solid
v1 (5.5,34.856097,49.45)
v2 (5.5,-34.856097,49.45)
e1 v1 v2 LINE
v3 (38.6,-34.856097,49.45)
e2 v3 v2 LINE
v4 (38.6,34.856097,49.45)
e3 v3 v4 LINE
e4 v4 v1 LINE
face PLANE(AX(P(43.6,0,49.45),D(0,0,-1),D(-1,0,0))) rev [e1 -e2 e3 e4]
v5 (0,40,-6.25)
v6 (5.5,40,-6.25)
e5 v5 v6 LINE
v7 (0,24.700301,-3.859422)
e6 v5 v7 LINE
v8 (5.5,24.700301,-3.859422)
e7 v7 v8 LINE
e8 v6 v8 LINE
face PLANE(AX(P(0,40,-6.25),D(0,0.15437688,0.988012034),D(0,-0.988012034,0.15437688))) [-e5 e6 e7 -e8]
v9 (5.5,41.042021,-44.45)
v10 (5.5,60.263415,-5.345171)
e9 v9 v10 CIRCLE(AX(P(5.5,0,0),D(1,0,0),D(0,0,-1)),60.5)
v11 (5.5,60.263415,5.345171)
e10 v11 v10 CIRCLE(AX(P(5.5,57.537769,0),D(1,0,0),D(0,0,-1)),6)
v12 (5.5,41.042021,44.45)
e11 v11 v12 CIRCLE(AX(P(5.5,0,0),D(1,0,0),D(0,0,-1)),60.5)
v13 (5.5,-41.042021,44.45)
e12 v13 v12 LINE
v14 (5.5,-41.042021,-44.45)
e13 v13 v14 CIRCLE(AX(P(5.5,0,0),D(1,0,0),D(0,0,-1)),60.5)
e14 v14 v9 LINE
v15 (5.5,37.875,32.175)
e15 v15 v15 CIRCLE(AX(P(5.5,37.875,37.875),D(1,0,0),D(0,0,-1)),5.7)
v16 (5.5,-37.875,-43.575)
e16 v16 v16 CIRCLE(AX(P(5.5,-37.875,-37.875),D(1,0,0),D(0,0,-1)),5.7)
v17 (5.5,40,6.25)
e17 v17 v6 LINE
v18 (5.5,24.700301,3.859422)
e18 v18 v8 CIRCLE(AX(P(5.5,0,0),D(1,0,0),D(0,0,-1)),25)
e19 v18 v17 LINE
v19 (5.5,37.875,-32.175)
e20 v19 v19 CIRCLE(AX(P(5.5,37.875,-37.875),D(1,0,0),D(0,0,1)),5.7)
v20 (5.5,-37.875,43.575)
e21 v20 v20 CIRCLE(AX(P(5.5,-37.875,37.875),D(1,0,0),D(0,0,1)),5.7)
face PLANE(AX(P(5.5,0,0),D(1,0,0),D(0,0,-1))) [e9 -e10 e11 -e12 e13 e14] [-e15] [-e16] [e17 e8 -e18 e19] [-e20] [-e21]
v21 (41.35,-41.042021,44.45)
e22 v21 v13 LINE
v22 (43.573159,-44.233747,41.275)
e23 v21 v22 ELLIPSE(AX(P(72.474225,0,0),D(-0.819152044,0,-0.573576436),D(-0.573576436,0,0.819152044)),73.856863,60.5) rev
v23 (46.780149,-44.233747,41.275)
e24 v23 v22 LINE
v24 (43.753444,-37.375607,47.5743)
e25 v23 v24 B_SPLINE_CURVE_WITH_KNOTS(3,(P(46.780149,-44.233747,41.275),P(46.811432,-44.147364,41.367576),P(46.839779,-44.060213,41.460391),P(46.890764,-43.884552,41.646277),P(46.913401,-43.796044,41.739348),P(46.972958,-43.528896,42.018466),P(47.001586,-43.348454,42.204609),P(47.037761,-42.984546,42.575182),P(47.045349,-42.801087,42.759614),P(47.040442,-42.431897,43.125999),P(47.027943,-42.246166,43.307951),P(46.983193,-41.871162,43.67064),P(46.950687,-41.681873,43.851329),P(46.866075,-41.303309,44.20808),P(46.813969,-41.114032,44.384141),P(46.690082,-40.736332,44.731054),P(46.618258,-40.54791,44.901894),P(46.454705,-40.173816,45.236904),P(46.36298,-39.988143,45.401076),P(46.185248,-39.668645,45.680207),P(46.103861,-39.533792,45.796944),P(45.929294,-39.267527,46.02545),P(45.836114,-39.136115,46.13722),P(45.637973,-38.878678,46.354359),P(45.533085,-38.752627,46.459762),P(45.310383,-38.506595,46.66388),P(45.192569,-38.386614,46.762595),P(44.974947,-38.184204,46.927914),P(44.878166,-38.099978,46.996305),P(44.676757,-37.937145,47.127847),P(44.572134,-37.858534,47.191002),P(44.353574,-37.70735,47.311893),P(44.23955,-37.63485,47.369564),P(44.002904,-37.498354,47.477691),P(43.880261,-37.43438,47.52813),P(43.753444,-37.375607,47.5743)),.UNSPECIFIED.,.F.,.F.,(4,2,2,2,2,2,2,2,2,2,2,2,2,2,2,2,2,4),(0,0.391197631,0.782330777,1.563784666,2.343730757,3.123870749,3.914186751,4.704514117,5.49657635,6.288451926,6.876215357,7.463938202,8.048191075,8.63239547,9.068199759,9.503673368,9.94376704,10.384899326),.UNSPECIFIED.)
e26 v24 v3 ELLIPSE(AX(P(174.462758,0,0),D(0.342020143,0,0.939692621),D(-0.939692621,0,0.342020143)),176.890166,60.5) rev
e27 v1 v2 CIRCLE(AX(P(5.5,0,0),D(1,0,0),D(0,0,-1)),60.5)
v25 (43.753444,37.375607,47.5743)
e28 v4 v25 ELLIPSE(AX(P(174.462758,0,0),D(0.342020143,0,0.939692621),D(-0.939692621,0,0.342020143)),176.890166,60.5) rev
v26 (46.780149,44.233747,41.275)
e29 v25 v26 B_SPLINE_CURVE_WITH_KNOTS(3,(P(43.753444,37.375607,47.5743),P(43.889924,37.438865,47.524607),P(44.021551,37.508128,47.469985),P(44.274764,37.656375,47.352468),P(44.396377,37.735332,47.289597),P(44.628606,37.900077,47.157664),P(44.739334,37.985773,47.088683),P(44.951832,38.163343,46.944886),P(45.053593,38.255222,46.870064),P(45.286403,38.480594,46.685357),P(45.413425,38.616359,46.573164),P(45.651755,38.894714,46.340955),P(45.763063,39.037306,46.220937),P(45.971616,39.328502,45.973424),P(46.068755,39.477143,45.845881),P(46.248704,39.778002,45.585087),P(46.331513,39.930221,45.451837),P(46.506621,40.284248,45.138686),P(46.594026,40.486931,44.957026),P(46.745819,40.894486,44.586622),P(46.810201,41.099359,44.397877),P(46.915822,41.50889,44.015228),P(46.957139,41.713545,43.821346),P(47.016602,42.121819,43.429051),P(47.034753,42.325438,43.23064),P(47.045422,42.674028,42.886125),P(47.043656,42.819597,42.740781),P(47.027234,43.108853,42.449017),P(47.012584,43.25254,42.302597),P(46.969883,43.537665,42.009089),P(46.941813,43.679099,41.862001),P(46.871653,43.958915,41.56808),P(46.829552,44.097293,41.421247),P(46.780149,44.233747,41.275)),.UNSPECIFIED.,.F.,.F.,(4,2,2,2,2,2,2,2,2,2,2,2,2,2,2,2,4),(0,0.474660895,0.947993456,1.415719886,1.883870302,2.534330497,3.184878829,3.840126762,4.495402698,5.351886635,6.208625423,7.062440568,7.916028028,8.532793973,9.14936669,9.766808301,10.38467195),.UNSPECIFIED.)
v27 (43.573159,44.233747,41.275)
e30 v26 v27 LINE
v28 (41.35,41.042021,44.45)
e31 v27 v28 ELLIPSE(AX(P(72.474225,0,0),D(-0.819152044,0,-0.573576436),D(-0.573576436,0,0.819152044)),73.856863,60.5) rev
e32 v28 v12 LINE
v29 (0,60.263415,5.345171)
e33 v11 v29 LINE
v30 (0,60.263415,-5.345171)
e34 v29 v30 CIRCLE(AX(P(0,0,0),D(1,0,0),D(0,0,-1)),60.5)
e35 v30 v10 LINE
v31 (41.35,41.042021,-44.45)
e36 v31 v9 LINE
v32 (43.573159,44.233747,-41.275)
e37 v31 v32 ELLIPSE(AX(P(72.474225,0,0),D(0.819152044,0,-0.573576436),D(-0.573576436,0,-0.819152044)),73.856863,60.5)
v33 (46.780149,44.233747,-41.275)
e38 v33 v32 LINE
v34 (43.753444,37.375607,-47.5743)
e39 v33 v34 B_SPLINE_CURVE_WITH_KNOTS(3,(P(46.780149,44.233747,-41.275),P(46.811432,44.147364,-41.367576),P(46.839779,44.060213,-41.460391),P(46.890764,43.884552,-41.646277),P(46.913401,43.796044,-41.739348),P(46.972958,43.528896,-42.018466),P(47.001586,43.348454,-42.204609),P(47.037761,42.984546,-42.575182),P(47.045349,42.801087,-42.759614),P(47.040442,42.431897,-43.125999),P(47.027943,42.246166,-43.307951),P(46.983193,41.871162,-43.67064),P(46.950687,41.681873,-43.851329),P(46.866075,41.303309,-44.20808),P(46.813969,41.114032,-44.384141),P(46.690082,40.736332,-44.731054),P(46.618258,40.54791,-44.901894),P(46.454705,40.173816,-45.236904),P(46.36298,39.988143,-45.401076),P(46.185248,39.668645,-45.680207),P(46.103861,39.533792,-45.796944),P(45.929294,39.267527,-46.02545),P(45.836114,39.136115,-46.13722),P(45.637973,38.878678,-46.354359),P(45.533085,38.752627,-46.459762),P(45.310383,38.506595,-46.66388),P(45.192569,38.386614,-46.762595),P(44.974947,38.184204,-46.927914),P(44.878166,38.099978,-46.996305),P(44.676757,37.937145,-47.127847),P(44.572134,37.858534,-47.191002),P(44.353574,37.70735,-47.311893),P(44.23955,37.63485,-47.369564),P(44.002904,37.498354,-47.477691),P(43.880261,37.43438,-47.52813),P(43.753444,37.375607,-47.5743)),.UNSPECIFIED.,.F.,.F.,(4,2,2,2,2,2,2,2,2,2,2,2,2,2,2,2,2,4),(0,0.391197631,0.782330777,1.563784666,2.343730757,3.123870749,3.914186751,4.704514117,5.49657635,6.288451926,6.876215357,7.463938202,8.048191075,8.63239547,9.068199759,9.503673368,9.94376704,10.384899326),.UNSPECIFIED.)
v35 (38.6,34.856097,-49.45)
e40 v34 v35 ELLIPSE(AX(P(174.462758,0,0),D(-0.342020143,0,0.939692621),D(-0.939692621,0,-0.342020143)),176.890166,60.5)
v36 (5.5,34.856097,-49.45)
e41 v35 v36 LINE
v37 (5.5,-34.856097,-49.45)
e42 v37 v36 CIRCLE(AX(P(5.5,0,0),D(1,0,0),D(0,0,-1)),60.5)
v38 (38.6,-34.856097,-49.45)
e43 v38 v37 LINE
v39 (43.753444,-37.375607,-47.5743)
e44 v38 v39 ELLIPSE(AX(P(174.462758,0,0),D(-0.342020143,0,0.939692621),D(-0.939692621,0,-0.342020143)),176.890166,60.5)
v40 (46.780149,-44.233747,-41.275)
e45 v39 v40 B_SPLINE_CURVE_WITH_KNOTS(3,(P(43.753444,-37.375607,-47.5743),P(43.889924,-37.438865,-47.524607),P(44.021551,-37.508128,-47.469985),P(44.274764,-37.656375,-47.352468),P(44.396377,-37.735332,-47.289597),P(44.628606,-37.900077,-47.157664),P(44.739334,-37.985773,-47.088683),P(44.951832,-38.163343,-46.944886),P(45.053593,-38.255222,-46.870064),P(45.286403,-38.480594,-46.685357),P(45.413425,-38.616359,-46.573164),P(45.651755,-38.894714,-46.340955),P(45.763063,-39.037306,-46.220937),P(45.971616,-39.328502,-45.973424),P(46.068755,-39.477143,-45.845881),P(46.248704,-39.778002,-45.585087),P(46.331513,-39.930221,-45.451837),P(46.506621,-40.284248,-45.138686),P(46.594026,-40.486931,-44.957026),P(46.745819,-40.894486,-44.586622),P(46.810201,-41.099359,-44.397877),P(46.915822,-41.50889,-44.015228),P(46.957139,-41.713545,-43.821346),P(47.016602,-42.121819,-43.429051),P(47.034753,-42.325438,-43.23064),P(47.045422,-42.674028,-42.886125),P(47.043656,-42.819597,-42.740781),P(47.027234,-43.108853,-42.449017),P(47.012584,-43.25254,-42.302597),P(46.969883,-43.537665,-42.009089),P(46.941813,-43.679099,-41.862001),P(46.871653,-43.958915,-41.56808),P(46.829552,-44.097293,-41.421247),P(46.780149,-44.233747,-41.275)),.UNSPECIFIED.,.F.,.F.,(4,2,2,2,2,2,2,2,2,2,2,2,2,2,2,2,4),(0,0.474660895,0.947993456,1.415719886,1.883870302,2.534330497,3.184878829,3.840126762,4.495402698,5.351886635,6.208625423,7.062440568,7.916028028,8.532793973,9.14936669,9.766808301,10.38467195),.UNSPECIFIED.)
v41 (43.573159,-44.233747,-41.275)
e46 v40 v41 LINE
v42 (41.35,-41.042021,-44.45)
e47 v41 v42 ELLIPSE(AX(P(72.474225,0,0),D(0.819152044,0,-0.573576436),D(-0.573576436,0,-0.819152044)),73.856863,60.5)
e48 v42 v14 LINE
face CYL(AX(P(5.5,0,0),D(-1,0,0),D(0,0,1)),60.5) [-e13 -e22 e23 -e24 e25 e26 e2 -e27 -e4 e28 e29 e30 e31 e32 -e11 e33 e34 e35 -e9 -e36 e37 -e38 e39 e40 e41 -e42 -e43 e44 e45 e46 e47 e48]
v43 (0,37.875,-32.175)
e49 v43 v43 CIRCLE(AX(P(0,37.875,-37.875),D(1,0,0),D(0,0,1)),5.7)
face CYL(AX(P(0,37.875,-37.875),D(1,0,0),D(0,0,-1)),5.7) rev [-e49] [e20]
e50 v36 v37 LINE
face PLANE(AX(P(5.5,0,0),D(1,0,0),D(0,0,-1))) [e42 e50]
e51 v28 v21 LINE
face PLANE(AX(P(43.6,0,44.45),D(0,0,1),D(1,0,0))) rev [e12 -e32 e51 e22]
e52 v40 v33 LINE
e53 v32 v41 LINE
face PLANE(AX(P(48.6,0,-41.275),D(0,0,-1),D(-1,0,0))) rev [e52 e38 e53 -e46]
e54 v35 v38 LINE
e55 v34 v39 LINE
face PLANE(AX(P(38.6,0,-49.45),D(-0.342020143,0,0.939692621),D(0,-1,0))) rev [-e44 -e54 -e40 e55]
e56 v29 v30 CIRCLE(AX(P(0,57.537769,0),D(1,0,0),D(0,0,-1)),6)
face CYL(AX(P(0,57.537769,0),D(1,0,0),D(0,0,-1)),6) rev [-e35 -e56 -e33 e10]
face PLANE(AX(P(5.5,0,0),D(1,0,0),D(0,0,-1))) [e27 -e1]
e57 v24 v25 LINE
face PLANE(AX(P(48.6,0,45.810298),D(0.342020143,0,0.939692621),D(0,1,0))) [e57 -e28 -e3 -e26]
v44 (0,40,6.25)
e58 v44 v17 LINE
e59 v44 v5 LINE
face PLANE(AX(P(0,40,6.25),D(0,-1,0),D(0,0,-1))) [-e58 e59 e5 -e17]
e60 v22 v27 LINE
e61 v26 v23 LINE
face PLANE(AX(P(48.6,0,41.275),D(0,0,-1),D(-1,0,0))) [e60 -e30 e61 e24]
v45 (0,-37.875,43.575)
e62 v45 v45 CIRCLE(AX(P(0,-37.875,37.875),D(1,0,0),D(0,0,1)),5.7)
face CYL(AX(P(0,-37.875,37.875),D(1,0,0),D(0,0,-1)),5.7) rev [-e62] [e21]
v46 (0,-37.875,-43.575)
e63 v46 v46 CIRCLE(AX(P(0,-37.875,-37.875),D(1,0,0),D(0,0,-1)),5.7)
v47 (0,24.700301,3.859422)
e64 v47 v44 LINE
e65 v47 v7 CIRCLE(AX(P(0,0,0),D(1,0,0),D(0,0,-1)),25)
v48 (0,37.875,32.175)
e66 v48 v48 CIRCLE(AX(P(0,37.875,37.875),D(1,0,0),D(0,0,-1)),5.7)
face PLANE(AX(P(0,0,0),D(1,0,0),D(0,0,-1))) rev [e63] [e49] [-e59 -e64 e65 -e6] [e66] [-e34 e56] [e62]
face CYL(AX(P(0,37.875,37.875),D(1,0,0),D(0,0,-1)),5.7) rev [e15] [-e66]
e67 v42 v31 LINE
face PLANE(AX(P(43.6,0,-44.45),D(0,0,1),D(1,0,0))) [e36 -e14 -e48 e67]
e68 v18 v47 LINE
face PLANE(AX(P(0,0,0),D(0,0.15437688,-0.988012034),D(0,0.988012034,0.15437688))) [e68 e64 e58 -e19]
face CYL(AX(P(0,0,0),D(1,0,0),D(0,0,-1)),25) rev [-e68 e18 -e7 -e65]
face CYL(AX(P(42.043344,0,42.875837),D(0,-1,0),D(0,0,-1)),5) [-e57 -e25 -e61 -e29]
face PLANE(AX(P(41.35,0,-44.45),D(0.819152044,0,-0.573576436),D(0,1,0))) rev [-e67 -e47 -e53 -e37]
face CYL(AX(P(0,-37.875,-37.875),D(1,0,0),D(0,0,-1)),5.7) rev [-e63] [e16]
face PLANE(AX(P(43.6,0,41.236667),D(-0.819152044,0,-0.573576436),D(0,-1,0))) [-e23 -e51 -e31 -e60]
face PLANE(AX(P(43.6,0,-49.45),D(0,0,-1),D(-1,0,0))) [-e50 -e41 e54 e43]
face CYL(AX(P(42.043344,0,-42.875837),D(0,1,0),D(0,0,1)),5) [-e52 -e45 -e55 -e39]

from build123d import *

# Parameters (mm, degrees)
SKETCH1_R           = 60.5
BOSS_EXTRUDE1_DEPTH = 5.5
SKETCH2_R           = 5.7
SKETCH2_R_2         = 25
CUT_EXTRUDE1_DEPTH  = 86.736514975
BOSS_EXTRUDE2_DEPTH = 38.1
BOSS_EXTRUDE3_DEPTH = 5
CHAMFER1_SIZE       = 10
CHAMFER1_SIZE_2     = 3.639702343
CHAMFER2_SIZE       = 10
CHAMFER2_SIZE2      = 3.639702343
CHAMFER3_SIZE       = 1.819851171
CHAMFER3_SIZE_2     = 5
CHAMFER4_SIZE       = 5
CHAMFER4_SIZE_2     = 1.819851171
FILLET1_R           = 5
CHAMFER5_SIZE       = 3.213333015
CHAMFER5_SIZE_2     = 2.25
CHAMFER6_SIZE       = 2.25
CHAMFER6_SIZE_2     = 3.213333015
SKETCH5_R           = 6
CUT_EXTRUDE2_DEPTH  = 96.112299108


with BuildPart() as part:
    # Sketch1 → Boss-Extrude1 (new body)
    with BuildSketch(Plane(origin=(0, 0, 0), x_dir=(0, 0, -1), z_dir=(1, 0, 0))):
        Circle(SKETCH1_R)
    extrude(amount=BOSS_EXTRUDE1_DEPTH)

    # Sketch2 → Cut-Extrude1 (cut, through all)
    with BuildSketch(Plane(origin=(5.5, 0, 0), x_dir=(0, 0, -1), z_dir=(1, 0, 0))):
        with Locations((-37.875, 37.875)):
            Circle(SKETCH2_R)
        with Locations(Location((37.875, 37.875, 0), (0, 0, 180))):
            Circle(SKETCH2_R)
        with Locations((37.875, -37.875)):
            Circle(SKETCH2_R)
        with Locations(Location((-37.875, -37.875, 0), (0, 0, 180))):
            Circle(SKETCH2_R)
        Circle(SKETCH2_R_2)
    extrude(amount=-CUT_EXTRUDE1_DEPTH, mode=Mode.SUBTRACT)

    # Sketch3 → Boss-Extrude2 (add)
    with BuildSketch(Plane(origin=(5.5, 0, 0), x_dir=(0, 0, -1), z_dir=(1, 0, 0))):
        with BuildLine():
            ThreePointArc((-44.45, 41.042021149), (-47.05176845, 38.03131717), (-49.45, 34.856097028))
            Line((-49.45, 34.856097028), (-49.45, -34.856097028))
            ThreePointArc((-49.45, -34.856097028), (-47.05176845, -38.03131717), (-44.45, -41.042021149))
            Line((-44.45, -41.042021149), (-44.45, 41.042021149))
        make_face()
        with BuildLine():
            ThreePointArc((49.45, 34.856097028), (47.05176845, 38.03131717), (44.45, 41.042021149))
            Line((44.45, 41.042021149), (44.45, -41.042021149))
            ThreePointArc((44.45, -41.042021149), (47.05176845, -38.03131717), (49.45, -34.856097028))
            Line((49.45, -34.856097028), (49.45, 34.856097028))
        make_face()
    extrude(amount=BOSS_EXTRUDE2_DEPTH)

    # Sketch4 → Boss-Extrude3 (add)
    with BuildSketch(Plane(origin=(43.6, 0, 0), x_dir=(0, 0, -1), z_dir=(1, 0, 0))):
        with BuildLine():
            Line((-41.275, -44.233747015), (-41.275, 44.233747015))
            ThreePointArc((-41.275, 44.233747015), (-42.892198414, 42.667426865), (-44.45, 41.042021149))
            Line((-44.45, 41.042021149), (-44.45, -41.042021149))
            ThreePointArc((-44.45, -41.042021149), (-42.892198414, -42.667426865), (-41.275, -44.233747015))
        make_face()
        with BuildLine():
            Line((-49.45, 34.856097028), (-49.45, -34.856097028))
            ThreePointArc((-49.45, -34.856097028), (-47.05176845, -38.03131717), (-44.45, -41.042021149))
            Line((-44.45, -41.042021149), (-44.45, 41.042021149))
            ThreePointArc((-44.45, 41.042021149), (-47.05176845, 38.03131717), (-49.45, 34.856097028))
        make_face()
        with BuildLine():
            Line((49.45, -34.856097028), (49.45, 34.856097028))
            ThreePointArc((49.45, 34.856097028), (45.604182769, 39.755609842), (41.275, 44.233747015))
            Line((41.275, 44.233747015), (41.275, -44.233747015))
            ThreePointArc((41.275, -44.233747015), (45.604182769, -39.755609842), (49.45, -34.856097028))
        make_face()
    extrude(amount=BOSS_EXTRUDE3_DEPTH)

    # Chamfer1
    # the kernel refuses this chamfer: 10, 3.639702343 mm, written as the material it takes off along each edge
    with BuildSketch(Plane(origin=(48.6, 60.798044353, 49.45), x_dir=(-0.9999130865277315, 0, 0.013184058198646176), z_dir=(0, -1, 0))) as chamfer1_piece_1:
        Polygon((CHAMFER1_SIZE * 0.999913086528, CHAMFER1_SIZE * 0.0131840581986), (-CHAMFER1_SIZE_2 * 0.0131840581974, CHAMFER1_SIZE_2 * 0.999913086435), (0, 0), align=None)
    extrude(amount=121.596088706, mode=Mode.SUBTRACT)

    # Chamfer2
    chamfer2_edges = [part.edges().sort_by_distance(p)[0] for p in [
        (48.6, 0, -49.45),
    ]]
    chamfer2_side = [part.faces().sort_by_distance(p)[0] for p in [
        (27.05, 0, -49.45),
    ]]
    chamfer(chamfer2_edges, length=CHAMFER2_SIZE, length2=CHAMFER2_SIZE2, reference=chamfer2_side[0])

    # Chamfer3
    # the kernel refuses this chamfer: 5, 1.819851171 mm, written as the material it takes off along each edge
    with BuildSketch(Plane(origin=(48.6, -57.204720678, 41.275), x_dir=(-0.9950833631817487, 0, -0.09904090225204971), z_dir=(0, 1, 0))) as chamfer3_piece_1:
        Polygon((CHAMFER3_SIZE * 0.995083363363, CHAMFER3_SIZE * 0.0990409022701), (-CHAMFER3_SIZE_2 * 0.099040902252, CHAMFER3_SIZE_2 * 0.995083363182), (0, 0), align=None)
    extrude(amount=114.409441356, mode=Mode.SUBTRACT)

    # Chamfer4
    # the kernel refuses this chamfer: 5, 1.819851171 mm, written as the material it takes off along each edge
    with BuildSketch(Plane(origin=(48.6, 57.204720678, -41.275), x_dir=(0.013184058198646176, 0, -0.9999130865277315), z_dir=(0, -1, 0))) as chamfer4_piece_1:
        Polygon((CHAMFER4_SIZE * 0.999913086528, -CHAMFER4_SIZE * 0.0131840581986), (-CHAMFER4_SIZE_2 * 0.013184058201, -CHAMFER4_SIZE_2 * 0.99991308671), (0, 0), align=None)
    extrude(amount=114.409441356, mode=Mode.SUBTRACT)

    # Fillet1
    # the kernel refuses this fillet: 5 mm, written as the material it takes off along each edge
    with BuildSketch(Plane(origin=(48.450647546, -51.951472504, -45.864657505), x_dir=(-0.9396926207859081, 0, -0.34202014332566955), z_dir=(0, 1, 0))) as fillet1_piece_1:
        with BuildLine():
            CenterArc((4.998659123, 5), FILLET1_R, 181.326957093, 88.673042907)
            Line((0, 4.8842115), (-0.099973182, 4.88189573))
            ThreePointArc((-0.099973182, 4.88189573), (-0.1, 2.44210575), (-0.1, 0))
            Line((-0.1, 0), (0, -0.1))
            Line((0, -0.1), (4.998659123, -0.1))
            Line((4.998659123, -0.1), (4.998659123, 0))
        make_face()
    extrude(amount=103.902945009, mode=Mode.SUBTRACT)
    with BuildSketch(Plane(origin=(48.450647546, -51.951472504, 45.864657505), x_dir=(-0.9396926207857893, 0, 0.3420201433259962), z_dir=(0, 1, 0))) as fillet1_piece_2:
        with BuildLine():
            CenterArc((4.998659123, -5), FILLET1_R, 90, 88.673042907)
            Line((0, -4.8842115), (-0.099973182, -4.88189573))
            ThreePointArc((-0.099973182, -4.88189573), (-0.1, -2.44210575), (-0.1, 0))
            Line((-0.1, 0), (0, 0.1))
            Line((0, 0.1), (4.998659123, 0.1))
            Line((4.998659123, 0.1), (4.998659123, 0))
        make_face()
    extrude(amount=103.902945009, mode=Mode.SUBTRACT)

    # Chamfer5
    # the kernel refuses this chamfer: 3.213333015, 2.25 mm, written as the material it adds along each edge
    with BuildSketch(Plane(origin=(43.6, -49.340621494, 44.45), x_dir=(0.02220967419845722, 0, -0.99975333476413), z_dir=(0, 1, 0))) as chamfer5_piece_1_section:
        Polygon((CHAMFER5_SIZE * 0.999753334817, CHAMFER5_SIZE * 0.0222096741996), (-CHAMFER5_SIZE_2 * 0.0222096741985, CHAMFER5_SIZE_2 * 0.999753334764), (0, 0), align=None)
    chamfer5_piece_1 = extrude(amount=98.681242988, mode=Mode.PRIVATE)
    chamfer5_piece_1 = chamfer5_piece_1 & Plane(origin=(42.872647852, 0, 0), x_dir=(0, 0, -1), z_dir=(-1, 0, 0)) * Cylinder(60.5, 211, mode=Mode.PRIVATE)
    chamfer5_piece_1 = split(chamfer5_piece_1, bisect_by=Plane(origin=(42.872647852, 1e-09, 41.275), z_dir=(0, 0, 1)), keep=Keep.TOP, mode=Mode.PRIVATE)
    add(chamfer5_piece_1)

    # Chamfer6
    # the kernel refuses this chamfer: 3.213333015, 2.25 mm, written as the material it adds along each edge
    with BuildSketch(Plane(origin=(43.6, 49.340621494, -44.45), x_dir=(-0.9989750717851553, 0, -0.04526373771402063), z_dir=(0, -1, 0))) as chamfer6_piece_1_section:
        Polygon((CHAMFER6_SIZE * 0.998975071785, -CHAMFER6_SIZE * 0.045263737714), (-CHAMFER6_SIZE_2 * 0.0452637377164, -CHAMFER6_SIZE_2 * 0.998975071838), (0, 0), align=None)
    chamfer6_piece_1 = extrude(amount=98.681242988, mode=Mode.PRIVATE)
    chamfer6_piece_1 = chamfer6_piece_1 & Plane(origin=(42.872647852, 0, 0), x_dir=(0, 0, -1), z_dir=(-1, 0, 0)) * Cylinder(60.5, 211, mode=Mode.PRIVATE)
    chamfer6_piece_1 = split(chamfer6_piece_1, bisect_by=Plane(origin=(42.872647852, -1e-09, -41.275), z_dir=(0, 0, -1)), keep=Keep.TOP, mode=Mode.PRIVATE)
    add(chamfer6_piece_1)

    # Sketch5 → Cut-Extrude2 (cut, through all)
    with BuildSketch(Plane(origin=(5.5, 0, 0), x_dir=(0, 0, -1), z_dir=(1, 0, 0))):
        with Locations((0, 57.537769206)):
            Circle(SKETCH5_R)
        Polygon((0, 0), (-6.25, 40), (6.25, 40), align=None)
    extrude(amount=-CUT_EXTRUDE2_DEPTH, mode=Mode.SUBTRACT)


solid = part.part
